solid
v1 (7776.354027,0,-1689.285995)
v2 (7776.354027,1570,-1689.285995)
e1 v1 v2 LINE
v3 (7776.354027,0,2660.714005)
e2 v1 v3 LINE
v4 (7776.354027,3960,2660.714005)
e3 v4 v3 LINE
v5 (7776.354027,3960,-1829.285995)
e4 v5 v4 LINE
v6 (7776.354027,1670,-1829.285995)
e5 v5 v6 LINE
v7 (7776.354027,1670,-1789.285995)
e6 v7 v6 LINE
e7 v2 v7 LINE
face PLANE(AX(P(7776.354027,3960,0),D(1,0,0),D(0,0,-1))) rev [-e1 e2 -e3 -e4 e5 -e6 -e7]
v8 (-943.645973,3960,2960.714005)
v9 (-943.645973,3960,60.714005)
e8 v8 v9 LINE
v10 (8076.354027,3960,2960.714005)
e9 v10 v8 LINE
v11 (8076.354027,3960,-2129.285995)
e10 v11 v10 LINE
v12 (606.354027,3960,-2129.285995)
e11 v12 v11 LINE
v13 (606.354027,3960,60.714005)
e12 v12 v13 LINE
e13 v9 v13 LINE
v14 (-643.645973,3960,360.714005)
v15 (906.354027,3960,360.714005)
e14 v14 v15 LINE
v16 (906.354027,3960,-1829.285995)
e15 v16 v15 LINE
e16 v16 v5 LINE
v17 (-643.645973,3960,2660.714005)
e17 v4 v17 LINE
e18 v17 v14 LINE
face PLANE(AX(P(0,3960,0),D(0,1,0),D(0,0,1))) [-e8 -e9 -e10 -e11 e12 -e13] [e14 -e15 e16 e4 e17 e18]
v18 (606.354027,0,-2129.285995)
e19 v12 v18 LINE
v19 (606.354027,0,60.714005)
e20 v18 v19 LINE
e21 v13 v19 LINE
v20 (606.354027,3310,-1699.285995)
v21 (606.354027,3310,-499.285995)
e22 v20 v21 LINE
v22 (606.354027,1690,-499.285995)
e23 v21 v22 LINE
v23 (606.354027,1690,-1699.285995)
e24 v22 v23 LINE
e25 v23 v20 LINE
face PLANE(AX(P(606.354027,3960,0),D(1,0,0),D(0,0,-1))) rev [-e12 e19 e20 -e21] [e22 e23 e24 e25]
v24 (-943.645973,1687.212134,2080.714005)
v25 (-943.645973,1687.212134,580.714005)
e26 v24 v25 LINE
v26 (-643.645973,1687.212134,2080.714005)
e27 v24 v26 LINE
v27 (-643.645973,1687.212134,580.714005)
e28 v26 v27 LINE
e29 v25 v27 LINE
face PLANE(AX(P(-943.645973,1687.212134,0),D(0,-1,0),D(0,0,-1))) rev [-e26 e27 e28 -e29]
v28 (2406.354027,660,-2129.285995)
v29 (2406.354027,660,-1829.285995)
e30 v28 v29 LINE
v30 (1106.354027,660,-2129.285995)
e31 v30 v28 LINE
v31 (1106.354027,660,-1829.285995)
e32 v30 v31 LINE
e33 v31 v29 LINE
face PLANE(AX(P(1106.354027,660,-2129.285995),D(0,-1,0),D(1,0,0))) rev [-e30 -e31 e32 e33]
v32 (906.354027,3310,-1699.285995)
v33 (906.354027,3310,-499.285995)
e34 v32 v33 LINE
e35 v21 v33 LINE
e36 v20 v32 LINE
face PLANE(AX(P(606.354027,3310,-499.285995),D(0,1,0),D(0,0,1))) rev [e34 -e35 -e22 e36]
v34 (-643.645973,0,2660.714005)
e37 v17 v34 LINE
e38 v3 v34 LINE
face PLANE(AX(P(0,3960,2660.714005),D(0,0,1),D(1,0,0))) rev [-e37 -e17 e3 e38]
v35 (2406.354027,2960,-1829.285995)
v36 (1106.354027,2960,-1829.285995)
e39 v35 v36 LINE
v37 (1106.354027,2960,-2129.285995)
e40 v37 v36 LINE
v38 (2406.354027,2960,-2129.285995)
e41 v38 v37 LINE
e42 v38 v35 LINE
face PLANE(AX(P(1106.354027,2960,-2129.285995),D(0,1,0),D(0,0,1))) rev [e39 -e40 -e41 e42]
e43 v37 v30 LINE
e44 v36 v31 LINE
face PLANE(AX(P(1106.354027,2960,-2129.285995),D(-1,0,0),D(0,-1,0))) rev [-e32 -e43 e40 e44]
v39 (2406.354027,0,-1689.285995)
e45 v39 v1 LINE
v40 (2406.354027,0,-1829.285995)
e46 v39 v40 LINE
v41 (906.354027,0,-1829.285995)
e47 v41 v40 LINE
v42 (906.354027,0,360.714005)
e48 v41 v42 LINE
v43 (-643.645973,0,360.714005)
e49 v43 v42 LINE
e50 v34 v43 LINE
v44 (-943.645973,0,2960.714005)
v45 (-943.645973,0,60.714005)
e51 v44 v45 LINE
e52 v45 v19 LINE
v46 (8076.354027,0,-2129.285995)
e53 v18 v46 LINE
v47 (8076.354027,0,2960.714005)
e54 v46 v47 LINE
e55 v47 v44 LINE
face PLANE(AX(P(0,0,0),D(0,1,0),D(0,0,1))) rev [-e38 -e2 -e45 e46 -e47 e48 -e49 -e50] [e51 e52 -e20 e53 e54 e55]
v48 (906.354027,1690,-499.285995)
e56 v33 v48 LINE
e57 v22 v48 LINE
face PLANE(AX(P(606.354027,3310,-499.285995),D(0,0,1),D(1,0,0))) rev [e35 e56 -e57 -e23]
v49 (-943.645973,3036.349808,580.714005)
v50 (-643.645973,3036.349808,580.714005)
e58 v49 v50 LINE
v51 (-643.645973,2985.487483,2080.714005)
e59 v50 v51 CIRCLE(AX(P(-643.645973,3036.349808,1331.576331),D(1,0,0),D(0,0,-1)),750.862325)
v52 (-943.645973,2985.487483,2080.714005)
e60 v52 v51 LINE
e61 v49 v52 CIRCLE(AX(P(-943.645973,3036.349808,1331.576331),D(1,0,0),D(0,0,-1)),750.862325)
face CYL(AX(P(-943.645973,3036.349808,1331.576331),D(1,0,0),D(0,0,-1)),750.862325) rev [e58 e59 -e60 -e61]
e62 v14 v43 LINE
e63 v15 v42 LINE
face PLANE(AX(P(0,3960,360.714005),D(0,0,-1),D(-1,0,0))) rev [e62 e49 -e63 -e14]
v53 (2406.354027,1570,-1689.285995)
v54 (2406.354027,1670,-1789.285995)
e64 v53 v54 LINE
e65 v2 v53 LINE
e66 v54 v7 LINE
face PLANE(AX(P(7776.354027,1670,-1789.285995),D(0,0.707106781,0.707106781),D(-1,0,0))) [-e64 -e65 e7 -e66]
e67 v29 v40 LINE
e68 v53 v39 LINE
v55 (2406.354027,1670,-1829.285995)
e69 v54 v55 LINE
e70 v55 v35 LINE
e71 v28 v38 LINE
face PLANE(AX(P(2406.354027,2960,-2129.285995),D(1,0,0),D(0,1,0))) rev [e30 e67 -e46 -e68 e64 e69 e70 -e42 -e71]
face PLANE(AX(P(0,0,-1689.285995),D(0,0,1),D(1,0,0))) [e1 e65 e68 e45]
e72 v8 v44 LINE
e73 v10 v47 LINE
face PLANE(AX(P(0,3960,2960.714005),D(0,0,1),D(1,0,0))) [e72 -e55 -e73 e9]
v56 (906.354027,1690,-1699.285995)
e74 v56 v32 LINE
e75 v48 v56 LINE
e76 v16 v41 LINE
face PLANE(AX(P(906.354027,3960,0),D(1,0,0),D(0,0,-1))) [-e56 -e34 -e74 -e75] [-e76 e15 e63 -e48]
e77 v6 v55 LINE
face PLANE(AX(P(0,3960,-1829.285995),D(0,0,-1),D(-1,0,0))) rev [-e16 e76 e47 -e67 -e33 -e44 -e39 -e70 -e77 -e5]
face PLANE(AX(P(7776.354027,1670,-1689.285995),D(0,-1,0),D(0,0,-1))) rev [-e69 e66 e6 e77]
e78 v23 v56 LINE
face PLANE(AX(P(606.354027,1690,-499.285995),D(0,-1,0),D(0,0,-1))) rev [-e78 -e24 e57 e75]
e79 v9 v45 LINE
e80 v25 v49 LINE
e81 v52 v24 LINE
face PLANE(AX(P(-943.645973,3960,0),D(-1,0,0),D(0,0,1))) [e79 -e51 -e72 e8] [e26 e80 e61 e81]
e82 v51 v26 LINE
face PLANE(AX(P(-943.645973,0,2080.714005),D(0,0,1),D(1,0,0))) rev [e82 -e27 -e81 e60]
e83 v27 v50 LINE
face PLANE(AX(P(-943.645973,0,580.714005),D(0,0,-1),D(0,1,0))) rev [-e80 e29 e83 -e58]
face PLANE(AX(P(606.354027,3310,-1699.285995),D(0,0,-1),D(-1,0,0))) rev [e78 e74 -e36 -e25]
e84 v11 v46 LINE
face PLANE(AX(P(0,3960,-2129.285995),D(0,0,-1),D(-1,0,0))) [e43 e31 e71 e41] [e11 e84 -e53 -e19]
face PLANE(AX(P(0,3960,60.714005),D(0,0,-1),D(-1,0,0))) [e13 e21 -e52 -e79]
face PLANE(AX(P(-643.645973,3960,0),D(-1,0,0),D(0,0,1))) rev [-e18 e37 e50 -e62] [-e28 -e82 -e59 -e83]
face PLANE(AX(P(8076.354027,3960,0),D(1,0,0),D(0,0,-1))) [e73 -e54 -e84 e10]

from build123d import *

# Parameters (mm, degrees)
SKETCH_1_W             = 6870
SKETCH_1_H             = 300
EXTRUDE_1381_DEPTH     = 3960
SKETCH_3_W             = 1300
SKETCH_3_H             = 2300
CUT_EXTRUDE_1685_DEPTH = 300
SKETCH_4_W             = 5370
SKETCH_4_H             = 1670
EXTRUDE_1932_DEPTH     = 140
FILLET_START           = -84.347935733
FILLET_1_OUTLINE_W     = 5370
FILLET_1_OUTLINE_H     = 141.421356237
FILLET_1_DEPTH         = 71.347935733
SKETCH_5_W             = 1200
SKETCH_5_H             = 1620
CUT_EXTRUDE_2305_DEPTH = 300
CUT_EXTRUDE_2865_DEPTH = 300


with BuildPart() as part:
    # Эскиз1 → Extrude 1381 (new body)
    with BuildSketch(Plane(origin=(0, 0, 0), x_dir=(1, 0, 0), z_dir=(0, 1, 0))):
        Polygon((8076.35402749, -2660.714005328), (7776.35402749, -2660.714005328), (7776.35402749, 1829.285994672), (7776.35402749, 2129.285994672), (8076.35402749, 2129.285994672), align=None)
        with Locations((4341.35402749, 1979.285994672)):
            Rectangle(SKETCH_1_W, SKETCH_1_H)
        Polygon((-643.64597251, -2960.714005328), (-643.64597251, -2660.714005328), (7776.35402749, -2660.714005328), (8076.35402749, -2660.714005328), (8076.35402749, -2960.714005328), align=None)
        Polygon((-943.64597251, -360.714005328), (-643.64597251, -360.714005328), (-643.64597251, -2660.714005328), (-643.64597251, -2960.714005328), (-943.64597251, -2960.714005328), align=None)
        Polygon((-943.64597251, -60.714005328), (606.35402749, -60.714005328), (606.35402749, 2129.285994672), (906.35402749, 2129.285994672), (906.35402749, 1829.285994672), (906.35402749, -360.714005328), (-643.64597251, -360.714005328), (-943.64597251, -360.714005328), align=None)
    extrude(amount=EXTRUDE_1381_DEPTH)

    # Эскиз3 → Cut-Extrude 1685 (cut)
    with BuildSketch(Plane.XY.offset(-1829.285994672)):
        with Locations((1756.35402749, 1810)):
            Rectangle(SKETCH_3_W, SKETCH_3_H)
    extrude(amount=-CUT_EXTRUDE_1685_DEPTH, mode=Mode.SUBTRACT)

    # Эскиз4 → Extrude 1932 (add)
    with BuildSketch(Plane.XY.offset(-1829.285994672)):
        with Locations((5091.35402749, 835)):
            Rectangle(SKETCH_4_W, SKETCH_4_H)
    extrude(amount=EXTRUDE_1932_DEPTH)

    # Фаска1: read off the stored shape, not the designer's step
    # Фаска1 outline → Фаска1 (cut)
    with BuildSketch(Plane(origin=(0, 0, 0), x_dir=(1, 0, 0), z_dir=(0, 0.7071067811865476, 0.7071067811865476)).offset(FILLET_START)):
        with Locations((5091.35402749, 2375.373906778)):
            Rectangle(FILLET_1_OUTLINE_W, FILLET_1_OUTLINE_H)
    extrude(amount=FILLET_1_DEPTH, mode=Mode.SUBTRACT)

    # Эскиз5 → Cut-Extrude 2305 (cut)
    with BuildSketch(Plane(origin=(906.35402749, 0, 0), x_dir=(0, 0, -1), z_dir=(1, 0, 0))):
        with Locations((1099.285994672, 2500)):
            Rectangle(SKETCH_5_W, SKETCH_5_H)
    extrude(amount=-CUT_EXTRUDE_2305_DEPTH, mode=Mode.SUBTRACT)

    # Эскиз6 → Cut-Extrude 2865 (cut)
    with BuildSketch(Plane(origin=(-643.64597251, 0, 0), x_dir=(0, 0, -1), z_dir=(1, 0, 0))):
        with BuildLine():
            ThreePointArc((-1331.576330709, 3787.212133652), (-1880.20408957, 3548.991802146), (-2080.714005328, 2985.48748289))
            Line((-2080.714005328, 2985.48748289), (-2080.714005328, 1687.212133652))
            Line((-2080.714005328, 1687.212133652), (-1330.714005328, 1687.212133652))
            Line((-1330.714005328, 1687.212133652), (-1331.576330709, 3787.212133652))
        make_face()
        with BuildLine():
            ThreePointArc((-582.43865609, 3087.212133652), (-818.934336835, 3584.977567133), (-1331.576330709, 3787.212133652))
            Line((-1331.576330709, 3787.212133652), (-1330.714005328, 1687.212133652))
            Line((-1330.714005328, 1687.212133652), (-580.714005328, 1687.212133652))
            Line((-580.714005328, 1687.212133652), (-580.714005328, 3036.349808271))
            ThreePointArc((-580.714005328, 3036.349808271), (-581.145291881, 3061.79558672), (-582.43865609, 3087.212133652))
        make_face()
    extrude(amount=-CUT_EXTRUDE_2865_DEPTH, mode=Mode.SUBTRACT)


solid = part.part
